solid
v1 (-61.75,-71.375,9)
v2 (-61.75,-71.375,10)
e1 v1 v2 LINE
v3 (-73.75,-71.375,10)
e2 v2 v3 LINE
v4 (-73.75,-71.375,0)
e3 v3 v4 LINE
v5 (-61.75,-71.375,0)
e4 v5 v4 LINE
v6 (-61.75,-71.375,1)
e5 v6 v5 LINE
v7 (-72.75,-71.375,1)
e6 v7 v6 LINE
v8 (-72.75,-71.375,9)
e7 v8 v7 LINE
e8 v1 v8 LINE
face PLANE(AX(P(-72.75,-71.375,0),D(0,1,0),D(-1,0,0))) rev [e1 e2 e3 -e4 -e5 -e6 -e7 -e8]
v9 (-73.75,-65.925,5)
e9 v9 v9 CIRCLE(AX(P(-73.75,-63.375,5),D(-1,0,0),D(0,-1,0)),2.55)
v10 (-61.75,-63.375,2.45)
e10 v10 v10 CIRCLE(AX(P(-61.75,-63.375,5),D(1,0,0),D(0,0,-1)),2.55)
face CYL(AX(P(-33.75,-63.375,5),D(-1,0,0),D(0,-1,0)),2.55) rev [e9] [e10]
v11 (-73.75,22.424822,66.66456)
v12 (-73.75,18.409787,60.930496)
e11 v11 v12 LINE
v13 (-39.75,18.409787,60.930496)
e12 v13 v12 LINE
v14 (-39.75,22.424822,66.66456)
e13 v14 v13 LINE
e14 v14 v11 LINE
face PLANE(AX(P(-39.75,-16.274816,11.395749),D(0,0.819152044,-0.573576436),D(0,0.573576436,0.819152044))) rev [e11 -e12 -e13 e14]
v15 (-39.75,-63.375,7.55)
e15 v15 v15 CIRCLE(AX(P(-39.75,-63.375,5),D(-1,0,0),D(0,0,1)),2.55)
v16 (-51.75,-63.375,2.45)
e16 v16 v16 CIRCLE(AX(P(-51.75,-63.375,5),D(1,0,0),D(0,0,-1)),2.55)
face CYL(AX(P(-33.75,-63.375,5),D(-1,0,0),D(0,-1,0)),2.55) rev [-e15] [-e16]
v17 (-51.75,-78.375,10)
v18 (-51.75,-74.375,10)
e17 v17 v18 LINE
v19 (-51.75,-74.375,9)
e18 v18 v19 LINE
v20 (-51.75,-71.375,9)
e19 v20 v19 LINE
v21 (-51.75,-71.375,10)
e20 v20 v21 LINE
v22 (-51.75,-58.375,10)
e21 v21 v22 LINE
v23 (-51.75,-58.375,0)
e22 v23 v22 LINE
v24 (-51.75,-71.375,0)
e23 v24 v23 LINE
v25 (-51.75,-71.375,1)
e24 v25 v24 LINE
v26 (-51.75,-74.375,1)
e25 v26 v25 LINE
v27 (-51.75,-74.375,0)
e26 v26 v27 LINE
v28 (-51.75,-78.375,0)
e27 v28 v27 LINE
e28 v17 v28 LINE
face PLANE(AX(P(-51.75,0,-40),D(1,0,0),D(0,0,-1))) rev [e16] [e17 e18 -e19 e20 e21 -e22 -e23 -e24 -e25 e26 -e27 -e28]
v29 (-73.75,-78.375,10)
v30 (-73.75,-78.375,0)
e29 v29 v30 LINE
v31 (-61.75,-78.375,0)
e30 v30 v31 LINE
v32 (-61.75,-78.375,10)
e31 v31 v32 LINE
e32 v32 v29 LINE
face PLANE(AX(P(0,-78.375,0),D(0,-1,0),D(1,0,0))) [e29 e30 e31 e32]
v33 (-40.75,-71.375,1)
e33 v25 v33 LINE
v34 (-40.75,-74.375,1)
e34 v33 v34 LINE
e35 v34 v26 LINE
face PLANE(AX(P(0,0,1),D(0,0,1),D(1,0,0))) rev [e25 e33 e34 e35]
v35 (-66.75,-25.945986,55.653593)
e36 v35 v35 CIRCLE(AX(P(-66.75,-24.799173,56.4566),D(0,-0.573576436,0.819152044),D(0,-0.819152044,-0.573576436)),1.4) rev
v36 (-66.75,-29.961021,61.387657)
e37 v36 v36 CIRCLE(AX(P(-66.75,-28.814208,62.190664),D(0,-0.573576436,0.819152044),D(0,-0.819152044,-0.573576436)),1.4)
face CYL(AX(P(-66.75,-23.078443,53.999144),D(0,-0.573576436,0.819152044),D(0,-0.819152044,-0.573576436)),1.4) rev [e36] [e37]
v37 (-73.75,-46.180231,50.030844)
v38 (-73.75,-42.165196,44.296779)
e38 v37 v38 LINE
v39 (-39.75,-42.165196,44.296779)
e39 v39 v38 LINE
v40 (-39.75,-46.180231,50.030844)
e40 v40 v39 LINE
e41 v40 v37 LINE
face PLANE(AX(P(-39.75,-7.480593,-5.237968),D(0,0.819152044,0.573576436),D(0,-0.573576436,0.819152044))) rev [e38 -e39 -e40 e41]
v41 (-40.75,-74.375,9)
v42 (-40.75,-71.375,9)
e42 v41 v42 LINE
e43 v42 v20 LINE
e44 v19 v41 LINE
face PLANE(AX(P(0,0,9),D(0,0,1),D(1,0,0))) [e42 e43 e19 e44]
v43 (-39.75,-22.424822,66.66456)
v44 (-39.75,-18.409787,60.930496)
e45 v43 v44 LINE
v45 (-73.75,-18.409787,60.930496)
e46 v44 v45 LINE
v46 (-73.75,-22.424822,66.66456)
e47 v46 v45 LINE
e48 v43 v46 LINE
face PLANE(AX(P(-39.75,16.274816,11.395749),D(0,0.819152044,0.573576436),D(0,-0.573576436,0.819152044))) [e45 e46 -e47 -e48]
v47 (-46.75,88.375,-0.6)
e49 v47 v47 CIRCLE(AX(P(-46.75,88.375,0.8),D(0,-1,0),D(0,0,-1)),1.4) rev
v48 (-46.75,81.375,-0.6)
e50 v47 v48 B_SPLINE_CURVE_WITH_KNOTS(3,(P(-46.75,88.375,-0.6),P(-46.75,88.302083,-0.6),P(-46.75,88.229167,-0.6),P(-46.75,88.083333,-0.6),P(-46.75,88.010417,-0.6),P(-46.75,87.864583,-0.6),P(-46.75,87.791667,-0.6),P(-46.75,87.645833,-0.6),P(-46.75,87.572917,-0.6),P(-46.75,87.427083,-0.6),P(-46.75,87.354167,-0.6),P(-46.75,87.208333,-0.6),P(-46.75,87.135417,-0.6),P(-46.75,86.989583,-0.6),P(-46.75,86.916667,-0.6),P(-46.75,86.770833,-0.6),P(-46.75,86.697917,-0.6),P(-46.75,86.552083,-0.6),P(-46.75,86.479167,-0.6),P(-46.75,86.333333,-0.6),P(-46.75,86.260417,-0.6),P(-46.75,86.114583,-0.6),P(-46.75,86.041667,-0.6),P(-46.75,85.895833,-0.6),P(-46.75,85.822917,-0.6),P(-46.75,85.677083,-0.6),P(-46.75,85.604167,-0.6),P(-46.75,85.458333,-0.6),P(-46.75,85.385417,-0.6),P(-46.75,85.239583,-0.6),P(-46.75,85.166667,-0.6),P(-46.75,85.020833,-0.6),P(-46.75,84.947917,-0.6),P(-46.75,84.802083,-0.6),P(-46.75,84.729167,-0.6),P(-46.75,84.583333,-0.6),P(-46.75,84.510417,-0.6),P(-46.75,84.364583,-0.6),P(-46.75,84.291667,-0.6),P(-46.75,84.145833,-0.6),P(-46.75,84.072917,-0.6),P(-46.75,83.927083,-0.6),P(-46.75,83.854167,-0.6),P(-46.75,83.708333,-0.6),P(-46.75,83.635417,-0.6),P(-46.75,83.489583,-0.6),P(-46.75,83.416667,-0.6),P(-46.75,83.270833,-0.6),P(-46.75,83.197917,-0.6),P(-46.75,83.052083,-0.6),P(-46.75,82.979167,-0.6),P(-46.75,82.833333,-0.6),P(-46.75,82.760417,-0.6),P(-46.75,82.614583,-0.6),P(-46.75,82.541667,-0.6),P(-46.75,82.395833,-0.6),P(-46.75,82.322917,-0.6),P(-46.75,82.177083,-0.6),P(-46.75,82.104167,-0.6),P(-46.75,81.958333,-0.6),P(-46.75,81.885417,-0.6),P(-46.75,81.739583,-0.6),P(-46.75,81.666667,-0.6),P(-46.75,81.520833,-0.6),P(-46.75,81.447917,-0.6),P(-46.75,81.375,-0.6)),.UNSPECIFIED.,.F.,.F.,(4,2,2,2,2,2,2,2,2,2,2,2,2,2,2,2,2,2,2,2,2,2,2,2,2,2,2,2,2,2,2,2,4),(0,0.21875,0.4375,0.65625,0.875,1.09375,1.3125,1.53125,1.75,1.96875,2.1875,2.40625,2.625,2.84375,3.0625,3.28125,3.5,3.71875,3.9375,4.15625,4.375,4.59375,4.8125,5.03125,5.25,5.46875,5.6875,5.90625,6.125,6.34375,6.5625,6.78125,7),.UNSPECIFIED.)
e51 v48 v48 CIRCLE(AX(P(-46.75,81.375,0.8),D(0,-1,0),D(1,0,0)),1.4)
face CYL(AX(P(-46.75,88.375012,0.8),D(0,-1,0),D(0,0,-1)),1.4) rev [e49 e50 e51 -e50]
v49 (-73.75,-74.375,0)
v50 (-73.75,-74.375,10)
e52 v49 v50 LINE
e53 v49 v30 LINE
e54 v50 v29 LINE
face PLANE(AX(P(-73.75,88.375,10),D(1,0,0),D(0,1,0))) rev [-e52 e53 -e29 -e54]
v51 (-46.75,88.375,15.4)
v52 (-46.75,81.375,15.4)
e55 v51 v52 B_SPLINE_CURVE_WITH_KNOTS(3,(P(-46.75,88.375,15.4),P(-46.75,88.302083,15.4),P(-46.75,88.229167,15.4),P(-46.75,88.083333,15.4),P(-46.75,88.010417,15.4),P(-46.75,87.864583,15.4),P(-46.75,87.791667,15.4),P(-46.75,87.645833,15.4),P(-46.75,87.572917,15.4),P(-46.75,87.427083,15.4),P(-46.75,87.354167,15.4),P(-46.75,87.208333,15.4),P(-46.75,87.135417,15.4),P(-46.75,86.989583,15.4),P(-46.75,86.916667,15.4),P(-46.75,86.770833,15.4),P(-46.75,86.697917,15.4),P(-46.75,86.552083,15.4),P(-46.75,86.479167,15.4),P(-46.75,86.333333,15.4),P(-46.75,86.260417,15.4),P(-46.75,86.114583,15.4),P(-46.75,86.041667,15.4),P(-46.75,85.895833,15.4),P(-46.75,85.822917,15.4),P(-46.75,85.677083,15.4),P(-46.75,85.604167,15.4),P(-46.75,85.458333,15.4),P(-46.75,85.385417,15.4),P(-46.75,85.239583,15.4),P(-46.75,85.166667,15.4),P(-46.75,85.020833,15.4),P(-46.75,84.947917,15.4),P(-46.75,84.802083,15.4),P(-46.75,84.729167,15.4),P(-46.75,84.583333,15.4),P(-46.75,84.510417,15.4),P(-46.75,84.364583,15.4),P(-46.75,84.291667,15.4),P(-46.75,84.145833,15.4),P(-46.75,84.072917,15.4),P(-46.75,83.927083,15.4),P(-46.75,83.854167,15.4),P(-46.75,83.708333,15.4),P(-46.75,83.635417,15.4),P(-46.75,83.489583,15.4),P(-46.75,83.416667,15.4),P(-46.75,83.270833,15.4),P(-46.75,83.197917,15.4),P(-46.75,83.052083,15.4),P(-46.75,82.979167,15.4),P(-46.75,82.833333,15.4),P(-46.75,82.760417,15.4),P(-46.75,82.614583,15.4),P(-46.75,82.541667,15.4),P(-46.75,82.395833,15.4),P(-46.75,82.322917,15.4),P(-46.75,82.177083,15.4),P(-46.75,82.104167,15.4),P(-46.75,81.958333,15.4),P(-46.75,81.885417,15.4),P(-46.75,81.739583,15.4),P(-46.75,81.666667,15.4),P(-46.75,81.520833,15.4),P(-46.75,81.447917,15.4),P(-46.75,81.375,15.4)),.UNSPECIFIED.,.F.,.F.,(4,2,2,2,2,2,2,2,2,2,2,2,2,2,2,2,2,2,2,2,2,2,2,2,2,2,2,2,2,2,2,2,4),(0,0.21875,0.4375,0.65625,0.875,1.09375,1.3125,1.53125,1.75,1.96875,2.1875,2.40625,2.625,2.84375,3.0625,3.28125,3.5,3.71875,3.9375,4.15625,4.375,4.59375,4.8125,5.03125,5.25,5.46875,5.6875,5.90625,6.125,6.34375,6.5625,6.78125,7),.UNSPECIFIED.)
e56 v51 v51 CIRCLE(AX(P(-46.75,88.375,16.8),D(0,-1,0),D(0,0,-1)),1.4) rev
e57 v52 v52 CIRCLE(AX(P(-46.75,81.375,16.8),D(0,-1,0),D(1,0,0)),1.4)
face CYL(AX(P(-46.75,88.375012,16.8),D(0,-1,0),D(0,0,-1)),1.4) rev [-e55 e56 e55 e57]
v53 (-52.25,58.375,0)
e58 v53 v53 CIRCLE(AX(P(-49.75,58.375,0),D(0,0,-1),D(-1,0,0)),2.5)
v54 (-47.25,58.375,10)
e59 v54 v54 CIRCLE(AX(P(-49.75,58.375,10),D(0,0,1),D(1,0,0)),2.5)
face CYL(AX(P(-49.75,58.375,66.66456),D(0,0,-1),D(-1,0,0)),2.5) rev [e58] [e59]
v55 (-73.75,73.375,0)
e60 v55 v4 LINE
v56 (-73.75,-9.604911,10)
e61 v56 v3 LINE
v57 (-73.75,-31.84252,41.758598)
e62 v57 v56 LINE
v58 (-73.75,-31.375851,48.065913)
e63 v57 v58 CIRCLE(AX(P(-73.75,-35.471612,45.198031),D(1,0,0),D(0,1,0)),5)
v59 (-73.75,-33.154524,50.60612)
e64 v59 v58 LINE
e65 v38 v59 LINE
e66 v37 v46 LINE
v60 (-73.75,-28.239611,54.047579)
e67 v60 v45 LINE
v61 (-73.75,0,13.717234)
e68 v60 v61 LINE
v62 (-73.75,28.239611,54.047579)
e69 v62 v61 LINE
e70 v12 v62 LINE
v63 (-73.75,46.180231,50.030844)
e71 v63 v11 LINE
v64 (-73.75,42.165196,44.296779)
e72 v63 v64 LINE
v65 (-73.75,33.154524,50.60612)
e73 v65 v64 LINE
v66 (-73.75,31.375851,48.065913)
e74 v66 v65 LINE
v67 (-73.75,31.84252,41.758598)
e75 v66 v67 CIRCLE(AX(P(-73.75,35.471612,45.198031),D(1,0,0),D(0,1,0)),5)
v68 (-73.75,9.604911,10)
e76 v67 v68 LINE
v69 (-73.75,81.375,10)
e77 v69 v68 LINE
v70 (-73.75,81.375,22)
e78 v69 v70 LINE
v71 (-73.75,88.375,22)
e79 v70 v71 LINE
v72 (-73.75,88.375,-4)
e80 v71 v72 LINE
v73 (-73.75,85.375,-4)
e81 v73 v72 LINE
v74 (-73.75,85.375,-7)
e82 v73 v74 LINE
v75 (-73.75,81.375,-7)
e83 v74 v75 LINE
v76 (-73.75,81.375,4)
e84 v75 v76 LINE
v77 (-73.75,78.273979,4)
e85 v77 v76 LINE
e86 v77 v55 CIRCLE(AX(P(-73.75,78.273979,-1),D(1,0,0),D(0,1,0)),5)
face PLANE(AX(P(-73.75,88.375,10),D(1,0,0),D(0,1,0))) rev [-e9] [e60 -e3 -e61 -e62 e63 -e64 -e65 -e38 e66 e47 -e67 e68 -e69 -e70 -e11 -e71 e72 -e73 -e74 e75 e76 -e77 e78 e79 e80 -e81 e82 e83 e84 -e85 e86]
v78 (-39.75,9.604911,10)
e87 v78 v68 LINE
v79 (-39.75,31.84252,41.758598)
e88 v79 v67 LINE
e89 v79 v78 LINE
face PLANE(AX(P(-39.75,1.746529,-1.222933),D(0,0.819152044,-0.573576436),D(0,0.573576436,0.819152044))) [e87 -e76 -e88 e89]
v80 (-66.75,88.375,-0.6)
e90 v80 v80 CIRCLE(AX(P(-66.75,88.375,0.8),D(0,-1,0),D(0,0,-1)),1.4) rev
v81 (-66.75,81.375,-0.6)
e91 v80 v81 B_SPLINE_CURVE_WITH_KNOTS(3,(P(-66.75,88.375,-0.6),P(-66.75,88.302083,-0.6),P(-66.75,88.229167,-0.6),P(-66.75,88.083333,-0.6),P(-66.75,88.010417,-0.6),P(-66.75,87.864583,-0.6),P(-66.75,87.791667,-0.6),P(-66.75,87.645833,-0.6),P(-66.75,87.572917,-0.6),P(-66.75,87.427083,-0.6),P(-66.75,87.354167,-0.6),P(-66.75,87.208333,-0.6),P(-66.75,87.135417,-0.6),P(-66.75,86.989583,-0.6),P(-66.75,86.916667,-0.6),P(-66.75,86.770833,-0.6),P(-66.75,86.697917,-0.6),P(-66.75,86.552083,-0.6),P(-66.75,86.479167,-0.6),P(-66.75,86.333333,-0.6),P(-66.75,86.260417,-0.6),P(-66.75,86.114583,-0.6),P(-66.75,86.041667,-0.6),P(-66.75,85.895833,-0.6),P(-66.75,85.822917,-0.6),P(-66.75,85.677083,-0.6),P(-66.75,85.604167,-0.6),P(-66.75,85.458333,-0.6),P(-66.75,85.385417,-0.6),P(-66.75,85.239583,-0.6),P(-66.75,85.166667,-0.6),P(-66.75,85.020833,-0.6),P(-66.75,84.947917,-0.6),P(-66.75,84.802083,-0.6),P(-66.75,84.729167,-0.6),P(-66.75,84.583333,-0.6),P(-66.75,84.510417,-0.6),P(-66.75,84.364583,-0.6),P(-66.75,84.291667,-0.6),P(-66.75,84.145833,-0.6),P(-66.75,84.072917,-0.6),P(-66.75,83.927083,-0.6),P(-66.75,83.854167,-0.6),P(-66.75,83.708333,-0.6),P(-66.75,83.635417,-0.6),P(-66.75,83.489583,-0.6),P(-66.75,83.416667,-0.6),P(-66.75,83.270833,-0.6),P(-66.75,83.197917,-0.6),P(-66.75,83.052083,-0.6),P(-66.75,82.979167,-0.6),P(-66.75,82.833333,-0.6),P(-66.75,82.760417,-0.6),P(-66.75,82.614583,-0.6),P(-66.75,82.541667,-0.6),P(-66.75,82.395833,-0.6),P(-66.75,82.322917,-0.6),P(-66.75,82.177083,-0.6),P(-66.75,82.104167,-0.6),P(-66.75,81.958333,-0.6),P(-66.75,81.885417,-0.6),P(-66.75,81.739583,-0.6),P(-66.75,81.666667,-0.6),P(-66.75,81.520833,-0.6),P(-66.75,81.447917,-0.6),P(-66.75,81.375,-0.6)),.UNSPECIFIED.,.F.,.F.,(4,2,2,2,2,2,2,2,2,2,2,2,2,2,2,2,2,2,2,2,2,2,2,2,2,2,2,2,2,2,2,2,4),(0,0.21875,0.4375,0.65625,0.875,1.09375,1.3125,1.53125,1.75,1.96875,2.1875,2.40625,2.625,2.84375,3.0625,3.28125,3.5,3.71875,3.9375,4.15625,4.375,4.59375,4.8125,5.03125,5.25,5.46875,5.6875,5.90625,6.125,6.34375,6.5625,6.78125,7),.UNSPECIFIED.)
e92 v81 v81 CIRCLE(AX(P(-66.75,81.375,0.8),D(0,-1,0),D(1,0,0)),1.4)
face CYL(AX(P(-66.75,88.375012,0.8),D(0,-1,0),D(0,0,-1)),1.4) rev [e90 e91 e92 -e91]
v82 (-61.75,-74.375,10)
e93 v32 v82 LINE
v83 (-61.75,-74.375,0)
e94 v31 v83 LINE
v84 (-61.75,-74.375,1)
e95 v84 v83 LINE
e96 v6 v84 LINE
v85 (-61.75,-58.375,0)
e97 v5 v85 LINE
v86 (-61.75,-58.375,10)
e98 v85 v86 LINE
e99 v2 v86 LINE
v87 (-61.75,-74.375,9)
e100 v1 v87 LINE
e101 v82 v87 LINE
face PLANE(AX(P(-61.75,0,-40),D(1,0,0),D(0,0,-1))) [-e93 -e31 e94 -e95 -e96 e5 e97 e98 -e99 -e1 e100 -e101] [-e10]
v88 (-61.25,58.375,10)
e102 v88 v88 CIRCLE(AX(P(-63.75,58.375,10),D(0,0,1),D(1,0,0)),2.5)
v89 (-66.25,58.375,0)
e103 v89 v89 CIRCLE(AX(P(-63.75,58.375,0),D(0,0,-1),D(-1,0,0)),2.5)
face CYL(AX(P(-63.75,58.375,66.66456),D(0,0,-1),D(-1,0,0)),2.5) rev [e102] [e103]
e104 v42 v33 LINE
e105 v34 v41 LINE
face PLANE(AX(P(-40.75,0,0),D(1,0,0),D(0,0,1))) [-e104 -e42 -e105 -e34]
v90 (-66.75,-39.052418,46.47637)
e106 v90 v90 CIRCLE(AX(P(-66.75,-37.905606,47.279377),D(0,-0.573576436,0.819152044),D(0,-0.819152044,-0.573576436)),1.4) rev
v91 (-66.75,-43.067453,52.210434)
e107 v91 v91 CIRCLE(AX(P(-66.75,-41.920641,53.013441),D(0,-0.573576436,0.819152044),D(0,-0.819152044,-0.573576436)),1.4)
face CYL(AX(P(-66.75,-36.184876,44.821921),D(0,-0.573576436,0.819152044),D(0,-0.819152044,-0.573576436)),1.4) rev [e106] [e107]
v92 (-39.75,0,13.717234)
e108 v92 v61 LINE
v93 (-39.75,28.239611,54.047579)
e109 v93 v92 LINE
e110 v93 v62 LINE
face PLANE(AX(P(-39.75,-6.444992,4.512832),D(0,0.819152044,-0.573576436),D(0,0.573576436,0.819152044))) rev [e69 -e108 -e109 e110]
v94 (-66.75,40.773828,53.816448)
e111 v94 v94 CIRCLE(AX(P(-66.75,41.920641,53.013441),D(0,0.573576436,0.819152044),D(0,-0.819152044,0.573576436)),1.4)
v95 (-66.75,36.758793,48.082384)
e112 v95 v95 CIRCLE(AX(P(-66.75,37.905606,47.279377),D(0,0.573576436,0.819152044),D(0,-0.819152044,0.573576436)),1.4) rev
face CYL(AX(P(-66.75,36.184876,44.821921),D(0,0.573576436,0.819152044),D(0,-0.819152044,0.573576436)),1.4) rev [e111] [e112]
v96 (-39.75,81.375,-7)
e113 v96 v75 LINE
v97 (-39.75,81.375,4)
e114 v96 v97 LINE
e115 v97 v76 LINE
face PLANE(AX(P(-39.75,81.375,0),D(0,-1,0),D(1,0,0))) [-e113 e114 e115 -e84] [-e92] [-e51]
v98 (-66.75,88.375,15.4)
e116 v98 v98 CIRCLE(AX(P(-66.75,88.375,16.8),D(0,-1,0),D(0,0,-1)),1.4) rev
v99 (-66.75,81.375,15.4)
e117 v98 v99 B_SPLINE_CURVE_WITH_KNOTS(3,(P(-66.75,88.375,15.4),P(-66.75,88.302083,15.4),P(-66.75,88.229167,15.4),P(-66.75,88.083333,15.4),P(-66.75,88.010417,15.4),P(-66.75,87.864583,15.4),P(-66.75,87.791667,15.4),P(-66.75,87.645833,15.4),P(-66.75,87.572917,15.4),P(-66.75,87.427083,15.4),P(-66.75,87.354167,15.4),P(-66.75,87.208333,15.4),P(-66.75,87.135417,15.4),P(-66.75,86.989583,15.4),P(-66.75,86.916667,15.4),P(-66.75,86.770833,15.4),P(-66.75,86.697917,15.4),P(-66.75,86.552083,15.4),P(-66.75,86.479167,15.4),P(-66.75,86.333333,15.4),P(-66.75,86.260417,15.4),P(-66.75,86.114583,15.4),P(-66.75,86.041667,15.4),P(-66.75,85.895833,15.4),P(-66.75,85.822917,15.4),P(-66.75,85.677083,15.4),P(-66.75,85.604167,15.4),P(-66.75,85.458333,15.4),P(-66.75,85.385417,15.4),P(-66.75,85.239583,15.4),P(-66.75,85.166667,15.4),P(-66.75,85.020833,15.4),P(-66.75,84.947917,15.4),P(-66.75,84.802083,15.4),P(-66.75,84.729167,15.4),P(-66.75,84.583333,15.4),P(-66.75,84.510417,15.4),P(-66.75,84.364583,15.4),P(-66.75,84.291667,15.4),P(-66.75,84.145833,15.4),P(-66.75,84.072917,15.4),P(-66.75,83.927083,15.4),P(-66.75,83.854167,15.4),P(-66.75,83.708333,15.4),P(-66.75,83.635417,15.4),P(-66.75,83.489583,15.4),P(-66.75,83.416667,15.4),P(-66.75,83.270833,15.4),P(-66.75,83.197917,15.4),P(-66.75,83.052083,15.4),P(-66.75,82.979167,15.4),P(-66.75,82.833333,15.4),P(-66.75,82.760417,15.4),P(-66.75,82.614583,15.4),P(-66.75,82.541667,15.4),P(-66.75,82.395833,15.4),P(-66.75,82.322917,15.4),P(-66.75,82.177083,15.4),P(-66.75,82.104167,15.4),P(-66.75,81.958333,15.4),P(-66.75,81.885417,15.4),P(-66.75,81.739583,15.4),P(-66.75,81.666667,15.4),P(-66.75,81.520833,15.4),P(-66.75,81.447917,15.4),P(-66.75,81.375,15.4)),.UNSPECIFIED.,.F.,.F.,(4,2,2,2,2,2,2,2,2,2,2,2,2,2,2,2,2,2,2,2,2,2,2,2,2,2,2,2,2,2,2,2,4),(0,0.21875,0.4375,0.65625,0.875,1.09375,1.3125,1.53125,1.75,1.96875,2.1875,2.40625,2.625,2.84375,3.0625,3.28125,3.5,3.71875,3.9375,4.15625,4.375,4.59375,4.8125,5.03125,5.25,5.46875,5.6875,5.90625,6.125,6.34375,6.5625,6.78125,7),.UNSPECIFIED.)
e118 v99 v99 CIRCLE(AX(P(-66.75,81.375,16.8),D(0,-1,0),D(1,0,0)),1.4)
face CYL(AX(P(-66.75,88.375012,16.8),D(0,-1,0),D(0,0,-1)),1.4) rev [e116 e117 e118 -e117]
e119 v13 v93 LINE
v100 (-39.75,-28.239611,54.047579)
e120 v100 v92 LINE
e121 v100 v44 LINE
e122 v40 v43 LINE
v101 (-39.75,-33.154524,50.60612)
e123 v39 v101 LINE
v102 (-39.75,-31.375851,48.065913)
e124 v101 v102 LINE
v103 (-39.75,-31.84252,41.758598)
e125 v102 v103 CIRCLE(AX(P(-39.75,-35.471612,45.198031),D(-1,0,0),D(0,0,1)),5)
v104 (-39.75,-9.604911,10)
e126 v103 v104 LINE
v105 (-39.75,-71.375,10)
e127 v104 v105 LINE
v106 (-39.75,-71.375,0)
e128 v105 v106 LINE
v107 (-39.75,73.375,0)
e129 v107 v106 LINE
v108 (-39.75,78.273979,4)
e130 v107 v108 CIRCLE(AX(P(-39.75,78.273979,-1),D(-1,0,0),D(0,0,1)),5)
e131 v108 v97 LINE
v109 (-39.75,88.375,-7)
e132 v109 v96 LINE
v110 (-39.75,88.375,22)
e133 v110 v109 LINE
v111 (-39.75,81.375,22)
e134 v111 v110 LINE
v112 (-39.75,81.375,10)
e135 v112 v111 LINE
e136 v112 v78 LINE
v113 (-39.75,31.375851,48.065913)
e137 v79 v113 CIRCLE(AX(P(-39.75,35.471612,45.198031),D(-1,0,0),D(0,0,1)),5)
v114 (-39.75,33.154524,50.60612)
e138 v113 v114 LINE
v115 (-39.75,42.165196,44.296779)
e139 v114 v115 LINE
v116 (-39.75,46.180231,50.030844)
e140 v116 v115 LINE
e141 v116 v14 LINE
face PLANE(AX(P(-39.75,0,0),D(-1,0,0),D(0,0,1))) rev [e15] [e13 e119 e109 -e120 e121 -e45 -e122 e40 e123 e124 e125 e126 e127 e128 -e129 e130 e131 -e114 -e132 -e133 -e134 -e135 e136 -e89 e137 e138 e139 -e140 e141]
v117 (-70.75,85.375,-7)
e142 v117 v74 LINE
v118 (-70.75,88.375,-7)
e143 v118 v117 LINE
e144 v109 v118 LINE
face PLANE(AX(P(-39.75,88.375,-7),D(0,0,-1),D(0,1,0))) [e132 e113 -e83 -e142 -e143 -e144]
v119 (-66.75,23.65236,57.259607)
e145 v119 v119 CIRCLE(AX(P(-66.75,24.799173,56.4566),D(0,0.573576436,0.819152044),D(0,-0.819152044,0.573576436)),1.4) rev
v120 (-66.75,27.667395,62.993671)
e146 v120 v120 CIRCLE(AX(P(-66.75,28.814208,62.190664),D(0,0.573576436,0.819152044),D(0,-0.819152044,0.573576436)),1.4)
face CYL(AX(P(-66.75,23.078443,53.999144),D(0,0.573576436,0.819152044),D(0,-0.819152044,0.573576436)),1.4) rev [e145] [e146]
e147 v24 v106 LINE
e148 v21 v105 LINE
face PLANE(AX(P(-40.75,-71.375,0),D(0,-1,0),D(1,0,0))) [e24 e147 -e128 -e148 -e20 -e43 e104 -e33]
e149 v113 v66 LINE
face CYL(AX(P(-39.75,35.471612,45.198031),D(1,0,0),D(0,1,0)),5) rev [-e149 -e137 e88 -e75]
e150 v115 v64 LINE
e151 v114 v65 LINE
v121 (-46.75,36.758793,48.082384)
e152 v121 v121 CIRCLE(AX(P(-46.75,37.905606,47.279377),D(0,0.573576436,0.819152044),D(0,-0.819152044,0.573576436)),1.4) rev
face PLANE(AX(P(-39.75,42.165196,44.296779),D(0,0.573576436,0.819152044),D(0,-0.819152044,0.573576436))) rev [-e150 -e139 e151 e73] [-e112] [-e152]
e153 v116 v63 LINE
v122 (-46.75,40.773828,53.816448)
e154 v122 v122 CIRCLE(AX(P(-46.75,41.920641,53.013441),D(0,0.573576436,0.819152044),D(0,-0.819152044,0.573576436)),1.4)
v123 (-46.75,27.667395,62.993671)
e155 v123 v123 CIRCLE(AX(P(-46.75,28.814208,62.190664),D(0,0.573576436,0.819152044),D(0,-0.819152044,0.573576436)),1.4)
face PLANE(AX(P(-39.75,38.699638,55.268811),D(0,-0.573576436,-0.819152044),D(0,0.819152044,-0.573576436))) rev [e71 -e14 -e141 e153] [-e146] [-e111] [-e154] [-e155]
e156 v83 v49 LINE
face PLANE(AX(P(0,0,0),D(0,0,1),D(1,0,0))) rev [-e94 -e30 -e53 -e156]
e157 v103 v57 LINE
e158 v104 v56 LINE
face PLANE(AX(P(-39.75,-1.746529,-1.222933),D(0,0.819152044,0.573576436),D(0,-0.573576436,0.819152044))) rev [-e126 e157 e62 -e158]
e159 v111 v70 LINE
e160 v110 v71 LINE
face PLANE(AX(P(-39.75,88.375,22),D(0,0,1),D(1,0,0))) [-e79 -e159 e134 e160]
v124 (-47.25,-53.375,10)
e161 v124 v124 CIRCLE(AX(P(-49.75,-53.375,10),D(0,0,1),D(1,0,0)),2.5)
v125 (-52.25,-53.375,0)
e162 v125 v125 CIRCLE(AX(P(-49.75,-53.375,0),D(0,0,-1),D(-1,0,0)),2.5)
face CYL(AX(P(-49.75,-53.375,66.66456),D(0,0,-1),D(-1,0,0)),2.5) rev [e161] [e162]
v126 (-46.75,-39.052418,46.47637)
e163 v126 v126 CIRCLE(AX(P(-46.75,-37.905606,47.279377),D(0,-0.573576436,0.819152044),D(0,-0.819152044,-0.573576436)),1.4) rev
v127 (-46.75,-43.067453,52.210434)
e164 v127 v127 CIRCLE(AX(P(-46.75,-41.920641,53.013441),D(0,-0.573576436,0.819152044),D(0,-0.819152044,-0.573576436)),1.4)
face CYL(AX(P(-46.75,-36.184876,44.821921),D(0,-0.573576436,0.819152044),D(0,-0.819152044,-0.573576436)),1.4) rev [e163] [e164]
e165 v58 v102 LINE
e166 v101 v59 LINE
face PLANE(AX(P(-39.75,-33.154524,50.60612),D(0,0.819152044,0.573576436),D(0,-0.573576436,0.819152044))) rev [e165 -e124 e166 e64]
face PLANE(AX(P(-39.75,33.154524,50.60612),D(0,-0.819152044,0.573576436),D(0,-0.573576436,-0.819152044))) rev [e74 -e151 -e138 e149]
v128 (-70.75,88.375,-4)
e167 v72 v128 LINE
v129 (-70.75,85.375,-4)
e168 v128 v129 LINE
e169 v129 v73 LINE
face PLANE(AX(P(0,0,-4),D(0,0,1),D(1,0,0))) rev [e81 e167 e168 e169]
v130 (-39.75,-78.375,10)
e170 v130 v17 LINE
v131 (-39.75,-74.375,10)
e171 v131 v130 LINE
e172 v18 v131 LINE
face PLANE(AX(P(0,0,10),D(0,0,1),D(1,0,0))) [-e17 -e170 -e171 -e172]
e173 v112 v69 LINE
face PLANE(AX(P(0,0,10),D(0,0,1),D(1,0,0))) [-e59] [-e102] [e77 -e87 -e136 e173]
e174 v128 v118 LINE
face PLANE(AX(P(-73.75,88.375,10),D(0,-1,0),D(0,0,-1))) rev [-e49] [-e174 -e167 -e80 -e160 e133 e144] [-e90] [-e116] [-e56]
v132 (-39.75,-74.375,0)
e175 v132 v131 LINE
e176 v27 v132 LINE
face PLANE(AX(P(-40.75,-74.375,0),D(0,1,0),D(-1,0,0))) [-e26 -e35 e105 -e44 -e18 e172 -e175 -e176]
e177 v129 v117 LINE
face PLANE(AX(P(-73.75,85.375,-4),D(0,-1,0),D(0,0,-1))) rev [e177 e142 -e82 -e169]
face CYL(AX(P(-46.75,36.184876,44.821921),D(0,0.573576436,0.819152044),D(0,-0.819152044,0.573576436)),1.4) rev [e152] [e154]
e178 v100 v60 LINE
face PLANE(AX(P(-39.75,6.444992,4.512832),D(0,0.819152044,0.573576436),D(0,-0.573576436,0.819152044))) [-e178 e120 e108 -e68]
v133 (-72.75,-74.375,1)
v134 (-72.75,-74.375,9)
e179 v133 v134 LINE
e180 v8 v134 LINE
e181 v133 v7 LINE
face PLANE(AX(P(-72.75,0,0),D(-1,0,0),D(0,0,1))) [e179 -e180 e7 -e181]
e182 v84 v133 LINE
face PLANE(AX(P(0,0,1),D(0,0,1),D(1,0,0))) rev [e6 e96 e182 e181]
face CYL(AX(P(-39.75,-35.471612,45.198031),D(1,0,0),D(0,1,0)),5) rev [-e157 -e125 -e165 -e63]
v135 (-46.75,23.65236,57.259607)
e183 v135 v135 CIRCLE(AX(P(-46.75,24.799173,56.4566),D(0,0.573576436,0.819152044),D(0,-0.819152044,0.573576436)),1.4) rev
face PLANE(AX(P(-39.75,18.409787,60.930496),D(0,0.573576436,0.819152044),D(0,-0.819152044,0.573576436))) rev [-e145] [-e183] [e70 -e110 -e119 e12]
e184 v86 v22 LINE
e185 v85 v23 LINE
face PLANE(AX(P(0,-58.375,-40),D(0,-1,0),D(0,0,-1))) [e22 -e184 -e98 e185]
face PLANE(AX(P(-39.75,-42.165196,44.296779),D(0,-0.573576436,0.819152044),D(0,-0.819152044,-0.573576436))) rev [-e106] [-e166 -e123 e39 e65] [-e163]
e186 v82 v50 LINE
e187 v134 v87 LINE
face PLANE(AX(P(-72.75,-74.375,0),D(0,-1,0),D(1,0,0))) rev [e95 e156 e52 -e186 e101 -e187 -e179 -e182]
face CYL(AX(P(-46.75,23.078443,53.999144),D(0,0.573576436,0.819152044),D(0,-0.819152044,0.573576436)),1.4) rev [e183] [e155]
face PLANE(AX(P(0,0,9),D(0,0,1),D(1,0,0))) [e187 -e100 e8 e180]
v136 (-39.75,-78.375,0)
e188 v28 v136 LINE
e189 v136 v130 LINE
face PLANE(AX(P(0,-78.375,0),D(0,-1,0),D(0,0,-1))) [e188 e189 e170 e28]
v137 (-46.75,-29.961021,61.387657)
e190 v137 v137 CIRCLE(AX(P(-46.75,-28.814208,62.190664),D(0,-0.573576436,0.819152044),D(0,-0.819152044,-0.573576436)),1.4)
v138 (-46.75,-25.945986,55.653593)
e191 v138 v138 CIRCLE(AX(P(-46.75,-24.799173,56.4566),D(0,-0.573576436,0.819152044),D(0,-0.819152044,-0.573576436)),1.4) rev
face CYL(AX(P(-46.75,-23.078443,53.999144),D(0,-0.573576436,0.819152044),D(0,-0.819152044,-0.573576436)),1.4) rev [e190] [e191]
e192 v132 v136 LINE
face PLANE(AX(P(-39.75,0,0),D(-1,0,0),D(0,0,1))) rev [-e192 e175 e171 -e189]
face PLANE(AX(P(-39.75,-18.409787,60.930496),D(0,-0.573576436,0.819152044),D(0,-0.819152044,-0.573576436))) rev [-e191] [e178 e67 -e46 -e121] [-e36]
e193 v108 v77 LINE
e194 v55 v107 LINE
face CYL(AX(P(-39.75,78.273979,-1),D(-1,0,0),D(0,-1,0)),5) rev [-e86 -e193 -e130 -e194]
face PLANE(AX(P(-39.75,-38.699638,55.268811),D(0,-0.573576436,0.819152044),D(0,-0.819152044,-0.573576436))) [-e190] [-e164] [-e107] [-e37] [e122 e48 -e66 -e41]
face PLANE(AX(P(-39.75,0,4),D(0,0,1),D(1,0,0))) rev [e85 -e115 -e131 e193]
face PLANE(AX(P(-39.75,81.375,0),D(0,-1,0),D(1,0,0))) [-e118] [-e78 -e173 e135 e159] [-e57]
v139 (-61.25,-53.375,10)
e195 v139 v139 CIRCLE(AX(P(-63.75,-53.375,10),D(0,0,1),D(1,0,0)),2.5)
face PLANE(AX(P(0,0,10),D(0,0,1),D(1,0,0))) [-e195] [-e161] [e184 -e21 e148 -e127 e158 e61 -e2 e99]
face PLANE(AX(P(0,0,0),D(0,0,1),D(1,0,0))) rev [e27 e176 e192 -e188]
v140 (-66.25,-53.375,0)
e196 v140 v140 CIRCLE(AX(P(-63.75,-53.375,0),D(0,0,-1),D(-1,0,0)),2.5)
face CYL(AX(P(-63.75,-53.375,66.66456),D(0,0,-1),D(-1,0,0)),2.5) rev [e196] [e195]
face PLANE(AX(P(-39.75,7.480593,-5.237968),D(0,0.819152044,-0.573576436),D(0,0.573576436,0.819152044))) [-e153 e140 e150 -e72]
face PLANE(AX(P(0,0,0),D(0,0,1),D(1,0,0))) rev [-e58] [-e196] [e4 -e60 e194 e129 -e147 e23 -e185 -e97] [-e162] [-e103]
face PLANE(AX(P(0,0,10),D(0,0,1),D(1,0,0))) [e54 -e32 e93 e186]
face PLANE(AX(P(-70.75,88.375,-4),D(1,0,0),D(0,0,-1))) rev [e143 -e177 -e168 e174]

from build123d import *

# Parameters (mm, degrees)
SKETCH2_W                = 147.5
SKETCH2_H                = 176.75
BOSS_EXTRUDE1_DEPTH      = 10
SKETCH3_W                = 29
SKETCH3_H                = 15
BOSS_EXTRUDE2_DEPTH      = 34
BOSS_EXTRUDE3_DEPTH      = 34
SKETCH8_W                = 113.5
SKETCH8_H                = 176.75
CUT_EXTRUDE1_DEPTH       = 30
SKETCH9_R                = 2.5
CUT_EXTRUDE2_DEPTH       = 134.016415209
SKETCH10_W               = 3
SKETCH10_H               = 3
CUT_EXTRUDE3_DEPTH       = 3
CUT_EXTRUDE8_DEPTH       = 40
CUT_EXTRUDE8_DEPTH_BACK  = 40
SKETCH11_W               = 10
SKETCH11_H               = 4
SKETCH11_H_2             = 8
SKETCH11_H_3             = 3
SKETCH14_R               = 2.55
CUT_EXTRUDE9_DEPTH       = 40
CUT_EXTRUDE10_DEPTH      = 190.85860157
CUT_EXTRUDE10_DEPTH_BACK = 10
SKETCH15_R               = 1.4
SKETCH16_W               = 12
SKETCH16_H               = 8
CUT_EXTRUDE11_DEPTH      = 116.802867905
FILLET1_R                = 5
SKETCH17_R               = 1.4
CUT_EXTRUDE12_DEPTH      = 10
SKETCH18_R               = 1.4
CUT_EXTRUDE13_DEPTH      = 10
CUT_EXTRUDE14_DEPTH      = 34
FILLET2_R                = 5
SKETCH21_W               = 12
SKETCH21_H               = 10
BOSS_EXTRUDE4_DEPTH      = 5
SKETCH22_W               = 10
SKETCH22_H               = 3
CUT_EXTRUDE15_DEPTH      = 1
SKETCH23_W               = 11
SKETCH23_H               = 3
CUT_EXTRUDE16_DEPTH      = 1
SKETCH24_W               = 32
SKETCH24_H               = 3
CUT_EXTRUDE17_DEPTH      = 1


with BuildPart() as part:
    # Sketch2 → Boss-Extrude1 (new body)
    with BuildSketch(Plane.XY):
        Rectangle(SKETCH2_W, SKETCH2_H)
    extrude(amount=BOSS_EXTRUDE1_DEPTH)

    # Sketch3 → Boss-Extrude2 (add)
    with BuildSketch(Plane.ZY.offset(73.75)):
        with Locations((7.5, 80.875)):
            Rectangle(SKETCH3_W, SKETCH3_H)
        with Locations((7.5, -80.875)):
            Rectangle(SKETCH3_W, SKETCH3_H)
    boss_extrude2 = extrude(amount=-BOSS_EXTRUDE2_DEPTH)

    # Mirror1: Boss-Extrude2 across plane
    add(boss_extrude2.mirror(Plane(origin=(0, 0, 0), x_dir=(0, 0, 1), z_dir=(1, 0, 0))))

    # Sketch5 → Boss-Extrude3 (add)
    with BuildSketch(Plane.ZY.offset(73.75)):
        Polygon((13.717233978, 0), (47.494362324, 23.650999887), (54.37727956, 13.821175356), (66.664560225, 22.424821901), (50.030843571, 46.180231185), (37.743562906, 37.57658464), (41.758597961, 31.84252033), (10, 9.604910635), (10, -9.604910635), (41.758597961, -31.84252033), (37.743562906, -37.57658464), (50.030843571, -46.180231185), (66.664560225, -22.424821901), (54.37727956, -13.821175356), (47.494362324, -23.650999887), align=None)
    extrude(amount=-BOSS_EXTRUDE3_DEPTH)

    # Sketch8 → Cut-Extrude1 (cut)
    with BuildSketch(Plane.XY.offset(22)):
        with Locations((17, 0)):
            Rectangle(SKETCH8_W, SKETCH8_H)
    extrude(amount=-CUT_EXTRUDE1_DEPTH, mode=Mode.SUBTRACT)

    # Sketch9 → Cut-Extrude2 (cut, through all)
    with BuildSketch(Plane(origin=(0, 0, 0), x_dir=(-1, 0, 0), z_dir=(0, 0, -1))):
        with Locations((49.75, 58.375)):
            Circle(SKETCH9_R)
        with Locations((63.75, 58.375)):
            Circle(SKETCH9_R)
        with Locations((49.75, -53.375)):
            Circle(SKETCH9_R)
        with Locations((63.75, -53.375)):
            Circle(SKETCH9_R)
    extrude(amount=-CUT_EXTRUDE2_DEPTH, mode=Mode.SUBTRACT)

    # Sketch10 → Cut-Extrude3 (cut)
    with BuildSketch(Plane(origin=(0, 0, -7), x_dir=(-1, 0, 0), z_dir=(0, 0, -1))):
        with Locations((72.25, 86.875)):
            Rectangle(SKETCH10_W, SKETCH10_H)
    extrude(amount=-CUT_EXTRUDE3_DEPTH, mode=Mode.SUBTRACT)

    # Sketch11 → Cut-Extrude8 (cut, two sides: drawn at the far end of the back side and taken through both)
    with BuildSketch(Plane(origin=(0, 0, 0), x_dir=(-1, 0, 0), z_dir=(0, 0, -1)).offset(-CUT_EXTRUDE8_DEPTH_BACK)):
        with Locations((56.75, -63.375)):
            Rectangle(SKETCH11_W, SKETCH11_H)
        with Locations((56.75, -69.375)):
            Rectangle(SKETCH11_W, SKETCH11_H_2)
        with Locations((56.75, -59.875)):
            Rectangle(SKETCH11_W, SKETCH11_H_3)
        Polygon((42.75, -73.375), (39.75, -73.375), (39.75, -88.375), (73.75, -88.375), (73.75, -73.375), (70.75, -73.375), (61.75, -73.375), (51.75, -73.375), align=None)
    extrude(amount=CUT_EXTRUDE8_DEPTH + CUT_EXTRUDE8_DEPTH_BACK, mode=Mode.SUBTRACT)

    # Sketch14 → Cut-Extrude9 (cut)
    with BuildSketch(Plane.ZY.offset(73.75)):
        with Locations(Location((5, -63.375, 0), (0, 0, 270))):
            Circle(SKETCH14_R)
    extrude(amount=-CUT_EXTRUDE9_DEPTH, mode=Mode.SUBTRACT)

    # Sketch15 → Cut-Extrude10 (cut, two sides: drawn at the far end of the back side and taken through both)
    with BuildSketch(Plane(origin=(0, 88.375, 0), x_dir=(1, 0, 0), z_dir=(0, 1, 0)).offset(-CUT_EXTRUDE10_DEPTH_BACK)):
        with Locations(Location((-46.75, -16.8, 0), (0, 0, 90))):
            Circle(SKETCH15_R)
        with Locations(Location((-66.75, -16.8, 0), (0, 0, 90))):
            Circle(SKETCH15_R)
        with Locations(Location((-66.75, -0.8, 0), (0, 0, 90))):
            Circle(SKETCH15_R)
        with Locations(Location((-46.75, -0.8, 0), (0, 0, 90))):
            Circle(SKETCH15_R)
    extrude(amount=CUT_EXTRUDE10_DEPTH + CUT_EXTRUDE10_DEPTH_BACK, mode=Mode.SUBTRACT)

    # Sketch16 → Cut-Extrude11 (cut, through all)
    with BuildSketch(Plane.ZY.offset(73.75)):
        Polygon((-7, 73.375), (0, 73.375), (4, 73.375), (4, 81.375), (-7, 81.375), (-7, 79.375), align=None)
        with Locations((16, 77.375)):
            Rectangle(SKETCH16_W, SKETCH16_H)
    extrude(amount=-CUT_EXTRUDE11_DEPTH, mode=Mode.SUBTRACT)

    # Fillet1
    # the kernel refuses this fillet: 5 mm, written as the material it adds along each edge
    with BuildSketch(Plane(origin=(-73.75, 73.375, 4), x_dir=(0, 1, 0), z_dir=(1, 0, 0))) as fillet1_piece_1:
        with BuildLine():
            CenterArc((4.898979486, -5), FILLET1_R, 90, 78.463040967)
            Line((0, -4), (-0.09797959, -3.98))
            ThreePointArc((-0.09797959, -3.98), (-0.1, -2), (-0.1, 0))
            Line((-0.1, 0), (0, 0.1))
            Line((0, 0.1), (4.898979486, 0.1))
            Line((4.898979486, 0.1), (4.898979486, 0))
        make_face()
    extrude(amount=34)

    # Sketch17 → Cut-Extrude12 (cut)
    with BuildSketch(Plane(origin=(0, 38.699638206, 55.268811165), x_dir=(1, 0, 0), z_dir=(0, 0.5735764363510447, 0.8191520442889927))):
        with Locations(Location((-66.75, 3.932117818, 0), (0, 0, 270))):
            Circle(SKETCH17_R)
        with Locations(Location((-46.75, 3.932117818, 0), (0, 0, 270))):
            Circle(SKETCH17_R)
        with Locations(Location((-46.75, -12.067882182, 0), (0, 0, 270))):
            Circle(SKETCH17_R)
        with Locations(Location((-66.75, -12.067882182, 0), (0, 0, 270))):
            Circle(SKETCH17_R)
    extrude(amount=-CUT_EXTRUDE12_DEPTH, mode=Mode.SUBTRACT)

    # Sketch18 → Cut-Extrude13 (cut)
    with BuildSketch(Plane(origin=(0, -38.699638206, 55.268811165), x_dir=(1, 0, 0), z_dir=(0, -0.5735764363510447, 0.8191520442889929))):
        with Locations(Location((-46.75, -3.932117818, 0), (0, 0, 270))):
            Circle(SKETCH18_R)
        with Locations(Location((-66.75, -3.932117818, 0), (0, 0, 270))):
            Circle(SKETCH18_R)
        with Locations(Location((-66.75, 12.067882182, 0), (0, 0, 270))):
            Circle(SKETCH18_R)
        with Locations(Location((-46.75, 12.067882182, 0), (0, 0, 270))):
            Circle(SKETCH18_R)
    extrude(amount=-CUT_EXTRUDE13_DEPTH, mode=Mode.SUBTRACT)

    # Sketch20 → Cut-Extrude14 (cut)
    with BuildSketch(Plane.ZY.offset(73.75)):
        Polygon((37.743562906, 37.57658464), (41.758597961, 31.84252033), (44.052903706, 28.565912153), (50.60612006, 33.154523644), (44.296779261, 42.165196131), align=None)
        Polygon((47.494362324, 23.650999887), (54.37727956, 13.821175356), (60.930495915, 18.409786846), (54.047578679, 28.239611378), align=None)
        Polygon((54.047578679, -28.239611378), (47.494362324, -23.650999887), (54.37727956, -13.821175356), (60.930495915, -18.409786846), align=None)
        Polygon((50.60612006, -33.154523644), (44.052903706, -28.565912153), (41.758597961, -31.84252033), (37.743562906, -37.57658464), (44.296779261, -42.165196131), align=None)
    extrude(amount=-CUT_EXTRUDE14_DEPTH, mode=Mode.SUBTRACT)

    # Fillet2
    # the kernel refuses this fillet: 5 mm, written as the material it adds along each edge
    with BuildSketch(Plane(origin=(-73.75, -28.565912153, 44.052903706), x_dir=(0, -0.573576436351048, 0.8191520442889905), z_dir=(1, 0, 0))) as fillet2_piece_1:
        with BuildLine():
            CenterArc((4.898979486, 5), FILLET2_R, 191.536959033, 78.463040967)
            Line((0, 4), (-0.09797959, 3.98))
            ThreePointArc((-0.09797959, 3.98), (-0.1, 2), (-0.1, 0))
            Line((-0.1, 0), (0, -0.1))
            Line((0, -0.1), (4.898979486, -0.1))
            Line((4.898979486, -0.1), (4.898979486, 0))
        make_face()
    extrude(amount=34)
    with BuildSketch(Plane(origin=(-73.75, 28.565912153, 44.052903706), x_dir=(0, 0.8191520442898972, -0.5735764363497533), z_dir=(1, 0, 0))) as fillet2_piece_2:
        with BuildLine():
            CenterArc((5, 4.898979486), FILLET2_R, 180, 78.463040967)
            Line((0, 4.898979486), (-0.1, 4.898979486))
            Line((-0.1, 4.898979486), (-0.1, 0))
            Line((-0.1, 0), (0, -0.1))
            ThreePointArc((0, -0.1), (2, -0.1), (3.98, -0.09797959))
            Line((3.98, -0.09797959), (4, 0))
        make_face()
    extrude(amount=34)

    # Sketch21 → Boss-Extrude4 (add)
    with BuildSketch(Plane.XZ.offset(73.375)):
        with Locations((-67.75, 5)):
            Rectangle(SKETCH21_W, SKETCH21_H)
        with Locations((-45.75, 5)):
            Rectangle(SKETCH21_W, SKETCH21_H)
    extrude(amount=BOSS_EXTRUDE4_DEPTH)

    # Sketch22 → Cut-Extrude15 (cut)
    with BuildSketch(Plane.ZY.offset(73.75)):
        with Locations((5, -72.875)):
            Rectangle(SKETCH22_W, SKETCH22_H)
    cut_extrude15 = extrude(amount=-CUT_EXTRUDE15_DEPTH, mode=Mode.SUBTRACT)

    # Mirror2: Cut-Extrude15 across plane
    add(cut_extrude15.mirror(Plane.ZY.offset(56.75)), mode=Mode.SUBTRACT)

    # Sketch23 → Cut-Extrude16 (cut)
    with BuildSketch(Plane(origin=(0, 0, 0), x_dir=(-1, 0, 0), z_dir=(0, 0, -1))):
        with Locations((67.25, -72.875)):
            Rectangle(SKETCH23_W, SKETCH23_H)
        with Locations((46.25, -72.875)):
            Rectangle(SKETCH23_W, SKETCH23_H)
    extrude(amount=-CUT_EXTRUDE16_DEPTH, mode=Mode.SUBTRACT)

    # Sketch24 → Cut-Extrude17 (cut)
    with BuildSketch(Plane.XY.offset(10)):
        with Locations((-56.75, -72.875)):
            Rectangle(SKETCH24_W, SKETCH24_H)
    extrude(amount=-CUT_EXTRUDE17_DEPTH, mode=Mode.SUBTRACT)


solid = part.part
